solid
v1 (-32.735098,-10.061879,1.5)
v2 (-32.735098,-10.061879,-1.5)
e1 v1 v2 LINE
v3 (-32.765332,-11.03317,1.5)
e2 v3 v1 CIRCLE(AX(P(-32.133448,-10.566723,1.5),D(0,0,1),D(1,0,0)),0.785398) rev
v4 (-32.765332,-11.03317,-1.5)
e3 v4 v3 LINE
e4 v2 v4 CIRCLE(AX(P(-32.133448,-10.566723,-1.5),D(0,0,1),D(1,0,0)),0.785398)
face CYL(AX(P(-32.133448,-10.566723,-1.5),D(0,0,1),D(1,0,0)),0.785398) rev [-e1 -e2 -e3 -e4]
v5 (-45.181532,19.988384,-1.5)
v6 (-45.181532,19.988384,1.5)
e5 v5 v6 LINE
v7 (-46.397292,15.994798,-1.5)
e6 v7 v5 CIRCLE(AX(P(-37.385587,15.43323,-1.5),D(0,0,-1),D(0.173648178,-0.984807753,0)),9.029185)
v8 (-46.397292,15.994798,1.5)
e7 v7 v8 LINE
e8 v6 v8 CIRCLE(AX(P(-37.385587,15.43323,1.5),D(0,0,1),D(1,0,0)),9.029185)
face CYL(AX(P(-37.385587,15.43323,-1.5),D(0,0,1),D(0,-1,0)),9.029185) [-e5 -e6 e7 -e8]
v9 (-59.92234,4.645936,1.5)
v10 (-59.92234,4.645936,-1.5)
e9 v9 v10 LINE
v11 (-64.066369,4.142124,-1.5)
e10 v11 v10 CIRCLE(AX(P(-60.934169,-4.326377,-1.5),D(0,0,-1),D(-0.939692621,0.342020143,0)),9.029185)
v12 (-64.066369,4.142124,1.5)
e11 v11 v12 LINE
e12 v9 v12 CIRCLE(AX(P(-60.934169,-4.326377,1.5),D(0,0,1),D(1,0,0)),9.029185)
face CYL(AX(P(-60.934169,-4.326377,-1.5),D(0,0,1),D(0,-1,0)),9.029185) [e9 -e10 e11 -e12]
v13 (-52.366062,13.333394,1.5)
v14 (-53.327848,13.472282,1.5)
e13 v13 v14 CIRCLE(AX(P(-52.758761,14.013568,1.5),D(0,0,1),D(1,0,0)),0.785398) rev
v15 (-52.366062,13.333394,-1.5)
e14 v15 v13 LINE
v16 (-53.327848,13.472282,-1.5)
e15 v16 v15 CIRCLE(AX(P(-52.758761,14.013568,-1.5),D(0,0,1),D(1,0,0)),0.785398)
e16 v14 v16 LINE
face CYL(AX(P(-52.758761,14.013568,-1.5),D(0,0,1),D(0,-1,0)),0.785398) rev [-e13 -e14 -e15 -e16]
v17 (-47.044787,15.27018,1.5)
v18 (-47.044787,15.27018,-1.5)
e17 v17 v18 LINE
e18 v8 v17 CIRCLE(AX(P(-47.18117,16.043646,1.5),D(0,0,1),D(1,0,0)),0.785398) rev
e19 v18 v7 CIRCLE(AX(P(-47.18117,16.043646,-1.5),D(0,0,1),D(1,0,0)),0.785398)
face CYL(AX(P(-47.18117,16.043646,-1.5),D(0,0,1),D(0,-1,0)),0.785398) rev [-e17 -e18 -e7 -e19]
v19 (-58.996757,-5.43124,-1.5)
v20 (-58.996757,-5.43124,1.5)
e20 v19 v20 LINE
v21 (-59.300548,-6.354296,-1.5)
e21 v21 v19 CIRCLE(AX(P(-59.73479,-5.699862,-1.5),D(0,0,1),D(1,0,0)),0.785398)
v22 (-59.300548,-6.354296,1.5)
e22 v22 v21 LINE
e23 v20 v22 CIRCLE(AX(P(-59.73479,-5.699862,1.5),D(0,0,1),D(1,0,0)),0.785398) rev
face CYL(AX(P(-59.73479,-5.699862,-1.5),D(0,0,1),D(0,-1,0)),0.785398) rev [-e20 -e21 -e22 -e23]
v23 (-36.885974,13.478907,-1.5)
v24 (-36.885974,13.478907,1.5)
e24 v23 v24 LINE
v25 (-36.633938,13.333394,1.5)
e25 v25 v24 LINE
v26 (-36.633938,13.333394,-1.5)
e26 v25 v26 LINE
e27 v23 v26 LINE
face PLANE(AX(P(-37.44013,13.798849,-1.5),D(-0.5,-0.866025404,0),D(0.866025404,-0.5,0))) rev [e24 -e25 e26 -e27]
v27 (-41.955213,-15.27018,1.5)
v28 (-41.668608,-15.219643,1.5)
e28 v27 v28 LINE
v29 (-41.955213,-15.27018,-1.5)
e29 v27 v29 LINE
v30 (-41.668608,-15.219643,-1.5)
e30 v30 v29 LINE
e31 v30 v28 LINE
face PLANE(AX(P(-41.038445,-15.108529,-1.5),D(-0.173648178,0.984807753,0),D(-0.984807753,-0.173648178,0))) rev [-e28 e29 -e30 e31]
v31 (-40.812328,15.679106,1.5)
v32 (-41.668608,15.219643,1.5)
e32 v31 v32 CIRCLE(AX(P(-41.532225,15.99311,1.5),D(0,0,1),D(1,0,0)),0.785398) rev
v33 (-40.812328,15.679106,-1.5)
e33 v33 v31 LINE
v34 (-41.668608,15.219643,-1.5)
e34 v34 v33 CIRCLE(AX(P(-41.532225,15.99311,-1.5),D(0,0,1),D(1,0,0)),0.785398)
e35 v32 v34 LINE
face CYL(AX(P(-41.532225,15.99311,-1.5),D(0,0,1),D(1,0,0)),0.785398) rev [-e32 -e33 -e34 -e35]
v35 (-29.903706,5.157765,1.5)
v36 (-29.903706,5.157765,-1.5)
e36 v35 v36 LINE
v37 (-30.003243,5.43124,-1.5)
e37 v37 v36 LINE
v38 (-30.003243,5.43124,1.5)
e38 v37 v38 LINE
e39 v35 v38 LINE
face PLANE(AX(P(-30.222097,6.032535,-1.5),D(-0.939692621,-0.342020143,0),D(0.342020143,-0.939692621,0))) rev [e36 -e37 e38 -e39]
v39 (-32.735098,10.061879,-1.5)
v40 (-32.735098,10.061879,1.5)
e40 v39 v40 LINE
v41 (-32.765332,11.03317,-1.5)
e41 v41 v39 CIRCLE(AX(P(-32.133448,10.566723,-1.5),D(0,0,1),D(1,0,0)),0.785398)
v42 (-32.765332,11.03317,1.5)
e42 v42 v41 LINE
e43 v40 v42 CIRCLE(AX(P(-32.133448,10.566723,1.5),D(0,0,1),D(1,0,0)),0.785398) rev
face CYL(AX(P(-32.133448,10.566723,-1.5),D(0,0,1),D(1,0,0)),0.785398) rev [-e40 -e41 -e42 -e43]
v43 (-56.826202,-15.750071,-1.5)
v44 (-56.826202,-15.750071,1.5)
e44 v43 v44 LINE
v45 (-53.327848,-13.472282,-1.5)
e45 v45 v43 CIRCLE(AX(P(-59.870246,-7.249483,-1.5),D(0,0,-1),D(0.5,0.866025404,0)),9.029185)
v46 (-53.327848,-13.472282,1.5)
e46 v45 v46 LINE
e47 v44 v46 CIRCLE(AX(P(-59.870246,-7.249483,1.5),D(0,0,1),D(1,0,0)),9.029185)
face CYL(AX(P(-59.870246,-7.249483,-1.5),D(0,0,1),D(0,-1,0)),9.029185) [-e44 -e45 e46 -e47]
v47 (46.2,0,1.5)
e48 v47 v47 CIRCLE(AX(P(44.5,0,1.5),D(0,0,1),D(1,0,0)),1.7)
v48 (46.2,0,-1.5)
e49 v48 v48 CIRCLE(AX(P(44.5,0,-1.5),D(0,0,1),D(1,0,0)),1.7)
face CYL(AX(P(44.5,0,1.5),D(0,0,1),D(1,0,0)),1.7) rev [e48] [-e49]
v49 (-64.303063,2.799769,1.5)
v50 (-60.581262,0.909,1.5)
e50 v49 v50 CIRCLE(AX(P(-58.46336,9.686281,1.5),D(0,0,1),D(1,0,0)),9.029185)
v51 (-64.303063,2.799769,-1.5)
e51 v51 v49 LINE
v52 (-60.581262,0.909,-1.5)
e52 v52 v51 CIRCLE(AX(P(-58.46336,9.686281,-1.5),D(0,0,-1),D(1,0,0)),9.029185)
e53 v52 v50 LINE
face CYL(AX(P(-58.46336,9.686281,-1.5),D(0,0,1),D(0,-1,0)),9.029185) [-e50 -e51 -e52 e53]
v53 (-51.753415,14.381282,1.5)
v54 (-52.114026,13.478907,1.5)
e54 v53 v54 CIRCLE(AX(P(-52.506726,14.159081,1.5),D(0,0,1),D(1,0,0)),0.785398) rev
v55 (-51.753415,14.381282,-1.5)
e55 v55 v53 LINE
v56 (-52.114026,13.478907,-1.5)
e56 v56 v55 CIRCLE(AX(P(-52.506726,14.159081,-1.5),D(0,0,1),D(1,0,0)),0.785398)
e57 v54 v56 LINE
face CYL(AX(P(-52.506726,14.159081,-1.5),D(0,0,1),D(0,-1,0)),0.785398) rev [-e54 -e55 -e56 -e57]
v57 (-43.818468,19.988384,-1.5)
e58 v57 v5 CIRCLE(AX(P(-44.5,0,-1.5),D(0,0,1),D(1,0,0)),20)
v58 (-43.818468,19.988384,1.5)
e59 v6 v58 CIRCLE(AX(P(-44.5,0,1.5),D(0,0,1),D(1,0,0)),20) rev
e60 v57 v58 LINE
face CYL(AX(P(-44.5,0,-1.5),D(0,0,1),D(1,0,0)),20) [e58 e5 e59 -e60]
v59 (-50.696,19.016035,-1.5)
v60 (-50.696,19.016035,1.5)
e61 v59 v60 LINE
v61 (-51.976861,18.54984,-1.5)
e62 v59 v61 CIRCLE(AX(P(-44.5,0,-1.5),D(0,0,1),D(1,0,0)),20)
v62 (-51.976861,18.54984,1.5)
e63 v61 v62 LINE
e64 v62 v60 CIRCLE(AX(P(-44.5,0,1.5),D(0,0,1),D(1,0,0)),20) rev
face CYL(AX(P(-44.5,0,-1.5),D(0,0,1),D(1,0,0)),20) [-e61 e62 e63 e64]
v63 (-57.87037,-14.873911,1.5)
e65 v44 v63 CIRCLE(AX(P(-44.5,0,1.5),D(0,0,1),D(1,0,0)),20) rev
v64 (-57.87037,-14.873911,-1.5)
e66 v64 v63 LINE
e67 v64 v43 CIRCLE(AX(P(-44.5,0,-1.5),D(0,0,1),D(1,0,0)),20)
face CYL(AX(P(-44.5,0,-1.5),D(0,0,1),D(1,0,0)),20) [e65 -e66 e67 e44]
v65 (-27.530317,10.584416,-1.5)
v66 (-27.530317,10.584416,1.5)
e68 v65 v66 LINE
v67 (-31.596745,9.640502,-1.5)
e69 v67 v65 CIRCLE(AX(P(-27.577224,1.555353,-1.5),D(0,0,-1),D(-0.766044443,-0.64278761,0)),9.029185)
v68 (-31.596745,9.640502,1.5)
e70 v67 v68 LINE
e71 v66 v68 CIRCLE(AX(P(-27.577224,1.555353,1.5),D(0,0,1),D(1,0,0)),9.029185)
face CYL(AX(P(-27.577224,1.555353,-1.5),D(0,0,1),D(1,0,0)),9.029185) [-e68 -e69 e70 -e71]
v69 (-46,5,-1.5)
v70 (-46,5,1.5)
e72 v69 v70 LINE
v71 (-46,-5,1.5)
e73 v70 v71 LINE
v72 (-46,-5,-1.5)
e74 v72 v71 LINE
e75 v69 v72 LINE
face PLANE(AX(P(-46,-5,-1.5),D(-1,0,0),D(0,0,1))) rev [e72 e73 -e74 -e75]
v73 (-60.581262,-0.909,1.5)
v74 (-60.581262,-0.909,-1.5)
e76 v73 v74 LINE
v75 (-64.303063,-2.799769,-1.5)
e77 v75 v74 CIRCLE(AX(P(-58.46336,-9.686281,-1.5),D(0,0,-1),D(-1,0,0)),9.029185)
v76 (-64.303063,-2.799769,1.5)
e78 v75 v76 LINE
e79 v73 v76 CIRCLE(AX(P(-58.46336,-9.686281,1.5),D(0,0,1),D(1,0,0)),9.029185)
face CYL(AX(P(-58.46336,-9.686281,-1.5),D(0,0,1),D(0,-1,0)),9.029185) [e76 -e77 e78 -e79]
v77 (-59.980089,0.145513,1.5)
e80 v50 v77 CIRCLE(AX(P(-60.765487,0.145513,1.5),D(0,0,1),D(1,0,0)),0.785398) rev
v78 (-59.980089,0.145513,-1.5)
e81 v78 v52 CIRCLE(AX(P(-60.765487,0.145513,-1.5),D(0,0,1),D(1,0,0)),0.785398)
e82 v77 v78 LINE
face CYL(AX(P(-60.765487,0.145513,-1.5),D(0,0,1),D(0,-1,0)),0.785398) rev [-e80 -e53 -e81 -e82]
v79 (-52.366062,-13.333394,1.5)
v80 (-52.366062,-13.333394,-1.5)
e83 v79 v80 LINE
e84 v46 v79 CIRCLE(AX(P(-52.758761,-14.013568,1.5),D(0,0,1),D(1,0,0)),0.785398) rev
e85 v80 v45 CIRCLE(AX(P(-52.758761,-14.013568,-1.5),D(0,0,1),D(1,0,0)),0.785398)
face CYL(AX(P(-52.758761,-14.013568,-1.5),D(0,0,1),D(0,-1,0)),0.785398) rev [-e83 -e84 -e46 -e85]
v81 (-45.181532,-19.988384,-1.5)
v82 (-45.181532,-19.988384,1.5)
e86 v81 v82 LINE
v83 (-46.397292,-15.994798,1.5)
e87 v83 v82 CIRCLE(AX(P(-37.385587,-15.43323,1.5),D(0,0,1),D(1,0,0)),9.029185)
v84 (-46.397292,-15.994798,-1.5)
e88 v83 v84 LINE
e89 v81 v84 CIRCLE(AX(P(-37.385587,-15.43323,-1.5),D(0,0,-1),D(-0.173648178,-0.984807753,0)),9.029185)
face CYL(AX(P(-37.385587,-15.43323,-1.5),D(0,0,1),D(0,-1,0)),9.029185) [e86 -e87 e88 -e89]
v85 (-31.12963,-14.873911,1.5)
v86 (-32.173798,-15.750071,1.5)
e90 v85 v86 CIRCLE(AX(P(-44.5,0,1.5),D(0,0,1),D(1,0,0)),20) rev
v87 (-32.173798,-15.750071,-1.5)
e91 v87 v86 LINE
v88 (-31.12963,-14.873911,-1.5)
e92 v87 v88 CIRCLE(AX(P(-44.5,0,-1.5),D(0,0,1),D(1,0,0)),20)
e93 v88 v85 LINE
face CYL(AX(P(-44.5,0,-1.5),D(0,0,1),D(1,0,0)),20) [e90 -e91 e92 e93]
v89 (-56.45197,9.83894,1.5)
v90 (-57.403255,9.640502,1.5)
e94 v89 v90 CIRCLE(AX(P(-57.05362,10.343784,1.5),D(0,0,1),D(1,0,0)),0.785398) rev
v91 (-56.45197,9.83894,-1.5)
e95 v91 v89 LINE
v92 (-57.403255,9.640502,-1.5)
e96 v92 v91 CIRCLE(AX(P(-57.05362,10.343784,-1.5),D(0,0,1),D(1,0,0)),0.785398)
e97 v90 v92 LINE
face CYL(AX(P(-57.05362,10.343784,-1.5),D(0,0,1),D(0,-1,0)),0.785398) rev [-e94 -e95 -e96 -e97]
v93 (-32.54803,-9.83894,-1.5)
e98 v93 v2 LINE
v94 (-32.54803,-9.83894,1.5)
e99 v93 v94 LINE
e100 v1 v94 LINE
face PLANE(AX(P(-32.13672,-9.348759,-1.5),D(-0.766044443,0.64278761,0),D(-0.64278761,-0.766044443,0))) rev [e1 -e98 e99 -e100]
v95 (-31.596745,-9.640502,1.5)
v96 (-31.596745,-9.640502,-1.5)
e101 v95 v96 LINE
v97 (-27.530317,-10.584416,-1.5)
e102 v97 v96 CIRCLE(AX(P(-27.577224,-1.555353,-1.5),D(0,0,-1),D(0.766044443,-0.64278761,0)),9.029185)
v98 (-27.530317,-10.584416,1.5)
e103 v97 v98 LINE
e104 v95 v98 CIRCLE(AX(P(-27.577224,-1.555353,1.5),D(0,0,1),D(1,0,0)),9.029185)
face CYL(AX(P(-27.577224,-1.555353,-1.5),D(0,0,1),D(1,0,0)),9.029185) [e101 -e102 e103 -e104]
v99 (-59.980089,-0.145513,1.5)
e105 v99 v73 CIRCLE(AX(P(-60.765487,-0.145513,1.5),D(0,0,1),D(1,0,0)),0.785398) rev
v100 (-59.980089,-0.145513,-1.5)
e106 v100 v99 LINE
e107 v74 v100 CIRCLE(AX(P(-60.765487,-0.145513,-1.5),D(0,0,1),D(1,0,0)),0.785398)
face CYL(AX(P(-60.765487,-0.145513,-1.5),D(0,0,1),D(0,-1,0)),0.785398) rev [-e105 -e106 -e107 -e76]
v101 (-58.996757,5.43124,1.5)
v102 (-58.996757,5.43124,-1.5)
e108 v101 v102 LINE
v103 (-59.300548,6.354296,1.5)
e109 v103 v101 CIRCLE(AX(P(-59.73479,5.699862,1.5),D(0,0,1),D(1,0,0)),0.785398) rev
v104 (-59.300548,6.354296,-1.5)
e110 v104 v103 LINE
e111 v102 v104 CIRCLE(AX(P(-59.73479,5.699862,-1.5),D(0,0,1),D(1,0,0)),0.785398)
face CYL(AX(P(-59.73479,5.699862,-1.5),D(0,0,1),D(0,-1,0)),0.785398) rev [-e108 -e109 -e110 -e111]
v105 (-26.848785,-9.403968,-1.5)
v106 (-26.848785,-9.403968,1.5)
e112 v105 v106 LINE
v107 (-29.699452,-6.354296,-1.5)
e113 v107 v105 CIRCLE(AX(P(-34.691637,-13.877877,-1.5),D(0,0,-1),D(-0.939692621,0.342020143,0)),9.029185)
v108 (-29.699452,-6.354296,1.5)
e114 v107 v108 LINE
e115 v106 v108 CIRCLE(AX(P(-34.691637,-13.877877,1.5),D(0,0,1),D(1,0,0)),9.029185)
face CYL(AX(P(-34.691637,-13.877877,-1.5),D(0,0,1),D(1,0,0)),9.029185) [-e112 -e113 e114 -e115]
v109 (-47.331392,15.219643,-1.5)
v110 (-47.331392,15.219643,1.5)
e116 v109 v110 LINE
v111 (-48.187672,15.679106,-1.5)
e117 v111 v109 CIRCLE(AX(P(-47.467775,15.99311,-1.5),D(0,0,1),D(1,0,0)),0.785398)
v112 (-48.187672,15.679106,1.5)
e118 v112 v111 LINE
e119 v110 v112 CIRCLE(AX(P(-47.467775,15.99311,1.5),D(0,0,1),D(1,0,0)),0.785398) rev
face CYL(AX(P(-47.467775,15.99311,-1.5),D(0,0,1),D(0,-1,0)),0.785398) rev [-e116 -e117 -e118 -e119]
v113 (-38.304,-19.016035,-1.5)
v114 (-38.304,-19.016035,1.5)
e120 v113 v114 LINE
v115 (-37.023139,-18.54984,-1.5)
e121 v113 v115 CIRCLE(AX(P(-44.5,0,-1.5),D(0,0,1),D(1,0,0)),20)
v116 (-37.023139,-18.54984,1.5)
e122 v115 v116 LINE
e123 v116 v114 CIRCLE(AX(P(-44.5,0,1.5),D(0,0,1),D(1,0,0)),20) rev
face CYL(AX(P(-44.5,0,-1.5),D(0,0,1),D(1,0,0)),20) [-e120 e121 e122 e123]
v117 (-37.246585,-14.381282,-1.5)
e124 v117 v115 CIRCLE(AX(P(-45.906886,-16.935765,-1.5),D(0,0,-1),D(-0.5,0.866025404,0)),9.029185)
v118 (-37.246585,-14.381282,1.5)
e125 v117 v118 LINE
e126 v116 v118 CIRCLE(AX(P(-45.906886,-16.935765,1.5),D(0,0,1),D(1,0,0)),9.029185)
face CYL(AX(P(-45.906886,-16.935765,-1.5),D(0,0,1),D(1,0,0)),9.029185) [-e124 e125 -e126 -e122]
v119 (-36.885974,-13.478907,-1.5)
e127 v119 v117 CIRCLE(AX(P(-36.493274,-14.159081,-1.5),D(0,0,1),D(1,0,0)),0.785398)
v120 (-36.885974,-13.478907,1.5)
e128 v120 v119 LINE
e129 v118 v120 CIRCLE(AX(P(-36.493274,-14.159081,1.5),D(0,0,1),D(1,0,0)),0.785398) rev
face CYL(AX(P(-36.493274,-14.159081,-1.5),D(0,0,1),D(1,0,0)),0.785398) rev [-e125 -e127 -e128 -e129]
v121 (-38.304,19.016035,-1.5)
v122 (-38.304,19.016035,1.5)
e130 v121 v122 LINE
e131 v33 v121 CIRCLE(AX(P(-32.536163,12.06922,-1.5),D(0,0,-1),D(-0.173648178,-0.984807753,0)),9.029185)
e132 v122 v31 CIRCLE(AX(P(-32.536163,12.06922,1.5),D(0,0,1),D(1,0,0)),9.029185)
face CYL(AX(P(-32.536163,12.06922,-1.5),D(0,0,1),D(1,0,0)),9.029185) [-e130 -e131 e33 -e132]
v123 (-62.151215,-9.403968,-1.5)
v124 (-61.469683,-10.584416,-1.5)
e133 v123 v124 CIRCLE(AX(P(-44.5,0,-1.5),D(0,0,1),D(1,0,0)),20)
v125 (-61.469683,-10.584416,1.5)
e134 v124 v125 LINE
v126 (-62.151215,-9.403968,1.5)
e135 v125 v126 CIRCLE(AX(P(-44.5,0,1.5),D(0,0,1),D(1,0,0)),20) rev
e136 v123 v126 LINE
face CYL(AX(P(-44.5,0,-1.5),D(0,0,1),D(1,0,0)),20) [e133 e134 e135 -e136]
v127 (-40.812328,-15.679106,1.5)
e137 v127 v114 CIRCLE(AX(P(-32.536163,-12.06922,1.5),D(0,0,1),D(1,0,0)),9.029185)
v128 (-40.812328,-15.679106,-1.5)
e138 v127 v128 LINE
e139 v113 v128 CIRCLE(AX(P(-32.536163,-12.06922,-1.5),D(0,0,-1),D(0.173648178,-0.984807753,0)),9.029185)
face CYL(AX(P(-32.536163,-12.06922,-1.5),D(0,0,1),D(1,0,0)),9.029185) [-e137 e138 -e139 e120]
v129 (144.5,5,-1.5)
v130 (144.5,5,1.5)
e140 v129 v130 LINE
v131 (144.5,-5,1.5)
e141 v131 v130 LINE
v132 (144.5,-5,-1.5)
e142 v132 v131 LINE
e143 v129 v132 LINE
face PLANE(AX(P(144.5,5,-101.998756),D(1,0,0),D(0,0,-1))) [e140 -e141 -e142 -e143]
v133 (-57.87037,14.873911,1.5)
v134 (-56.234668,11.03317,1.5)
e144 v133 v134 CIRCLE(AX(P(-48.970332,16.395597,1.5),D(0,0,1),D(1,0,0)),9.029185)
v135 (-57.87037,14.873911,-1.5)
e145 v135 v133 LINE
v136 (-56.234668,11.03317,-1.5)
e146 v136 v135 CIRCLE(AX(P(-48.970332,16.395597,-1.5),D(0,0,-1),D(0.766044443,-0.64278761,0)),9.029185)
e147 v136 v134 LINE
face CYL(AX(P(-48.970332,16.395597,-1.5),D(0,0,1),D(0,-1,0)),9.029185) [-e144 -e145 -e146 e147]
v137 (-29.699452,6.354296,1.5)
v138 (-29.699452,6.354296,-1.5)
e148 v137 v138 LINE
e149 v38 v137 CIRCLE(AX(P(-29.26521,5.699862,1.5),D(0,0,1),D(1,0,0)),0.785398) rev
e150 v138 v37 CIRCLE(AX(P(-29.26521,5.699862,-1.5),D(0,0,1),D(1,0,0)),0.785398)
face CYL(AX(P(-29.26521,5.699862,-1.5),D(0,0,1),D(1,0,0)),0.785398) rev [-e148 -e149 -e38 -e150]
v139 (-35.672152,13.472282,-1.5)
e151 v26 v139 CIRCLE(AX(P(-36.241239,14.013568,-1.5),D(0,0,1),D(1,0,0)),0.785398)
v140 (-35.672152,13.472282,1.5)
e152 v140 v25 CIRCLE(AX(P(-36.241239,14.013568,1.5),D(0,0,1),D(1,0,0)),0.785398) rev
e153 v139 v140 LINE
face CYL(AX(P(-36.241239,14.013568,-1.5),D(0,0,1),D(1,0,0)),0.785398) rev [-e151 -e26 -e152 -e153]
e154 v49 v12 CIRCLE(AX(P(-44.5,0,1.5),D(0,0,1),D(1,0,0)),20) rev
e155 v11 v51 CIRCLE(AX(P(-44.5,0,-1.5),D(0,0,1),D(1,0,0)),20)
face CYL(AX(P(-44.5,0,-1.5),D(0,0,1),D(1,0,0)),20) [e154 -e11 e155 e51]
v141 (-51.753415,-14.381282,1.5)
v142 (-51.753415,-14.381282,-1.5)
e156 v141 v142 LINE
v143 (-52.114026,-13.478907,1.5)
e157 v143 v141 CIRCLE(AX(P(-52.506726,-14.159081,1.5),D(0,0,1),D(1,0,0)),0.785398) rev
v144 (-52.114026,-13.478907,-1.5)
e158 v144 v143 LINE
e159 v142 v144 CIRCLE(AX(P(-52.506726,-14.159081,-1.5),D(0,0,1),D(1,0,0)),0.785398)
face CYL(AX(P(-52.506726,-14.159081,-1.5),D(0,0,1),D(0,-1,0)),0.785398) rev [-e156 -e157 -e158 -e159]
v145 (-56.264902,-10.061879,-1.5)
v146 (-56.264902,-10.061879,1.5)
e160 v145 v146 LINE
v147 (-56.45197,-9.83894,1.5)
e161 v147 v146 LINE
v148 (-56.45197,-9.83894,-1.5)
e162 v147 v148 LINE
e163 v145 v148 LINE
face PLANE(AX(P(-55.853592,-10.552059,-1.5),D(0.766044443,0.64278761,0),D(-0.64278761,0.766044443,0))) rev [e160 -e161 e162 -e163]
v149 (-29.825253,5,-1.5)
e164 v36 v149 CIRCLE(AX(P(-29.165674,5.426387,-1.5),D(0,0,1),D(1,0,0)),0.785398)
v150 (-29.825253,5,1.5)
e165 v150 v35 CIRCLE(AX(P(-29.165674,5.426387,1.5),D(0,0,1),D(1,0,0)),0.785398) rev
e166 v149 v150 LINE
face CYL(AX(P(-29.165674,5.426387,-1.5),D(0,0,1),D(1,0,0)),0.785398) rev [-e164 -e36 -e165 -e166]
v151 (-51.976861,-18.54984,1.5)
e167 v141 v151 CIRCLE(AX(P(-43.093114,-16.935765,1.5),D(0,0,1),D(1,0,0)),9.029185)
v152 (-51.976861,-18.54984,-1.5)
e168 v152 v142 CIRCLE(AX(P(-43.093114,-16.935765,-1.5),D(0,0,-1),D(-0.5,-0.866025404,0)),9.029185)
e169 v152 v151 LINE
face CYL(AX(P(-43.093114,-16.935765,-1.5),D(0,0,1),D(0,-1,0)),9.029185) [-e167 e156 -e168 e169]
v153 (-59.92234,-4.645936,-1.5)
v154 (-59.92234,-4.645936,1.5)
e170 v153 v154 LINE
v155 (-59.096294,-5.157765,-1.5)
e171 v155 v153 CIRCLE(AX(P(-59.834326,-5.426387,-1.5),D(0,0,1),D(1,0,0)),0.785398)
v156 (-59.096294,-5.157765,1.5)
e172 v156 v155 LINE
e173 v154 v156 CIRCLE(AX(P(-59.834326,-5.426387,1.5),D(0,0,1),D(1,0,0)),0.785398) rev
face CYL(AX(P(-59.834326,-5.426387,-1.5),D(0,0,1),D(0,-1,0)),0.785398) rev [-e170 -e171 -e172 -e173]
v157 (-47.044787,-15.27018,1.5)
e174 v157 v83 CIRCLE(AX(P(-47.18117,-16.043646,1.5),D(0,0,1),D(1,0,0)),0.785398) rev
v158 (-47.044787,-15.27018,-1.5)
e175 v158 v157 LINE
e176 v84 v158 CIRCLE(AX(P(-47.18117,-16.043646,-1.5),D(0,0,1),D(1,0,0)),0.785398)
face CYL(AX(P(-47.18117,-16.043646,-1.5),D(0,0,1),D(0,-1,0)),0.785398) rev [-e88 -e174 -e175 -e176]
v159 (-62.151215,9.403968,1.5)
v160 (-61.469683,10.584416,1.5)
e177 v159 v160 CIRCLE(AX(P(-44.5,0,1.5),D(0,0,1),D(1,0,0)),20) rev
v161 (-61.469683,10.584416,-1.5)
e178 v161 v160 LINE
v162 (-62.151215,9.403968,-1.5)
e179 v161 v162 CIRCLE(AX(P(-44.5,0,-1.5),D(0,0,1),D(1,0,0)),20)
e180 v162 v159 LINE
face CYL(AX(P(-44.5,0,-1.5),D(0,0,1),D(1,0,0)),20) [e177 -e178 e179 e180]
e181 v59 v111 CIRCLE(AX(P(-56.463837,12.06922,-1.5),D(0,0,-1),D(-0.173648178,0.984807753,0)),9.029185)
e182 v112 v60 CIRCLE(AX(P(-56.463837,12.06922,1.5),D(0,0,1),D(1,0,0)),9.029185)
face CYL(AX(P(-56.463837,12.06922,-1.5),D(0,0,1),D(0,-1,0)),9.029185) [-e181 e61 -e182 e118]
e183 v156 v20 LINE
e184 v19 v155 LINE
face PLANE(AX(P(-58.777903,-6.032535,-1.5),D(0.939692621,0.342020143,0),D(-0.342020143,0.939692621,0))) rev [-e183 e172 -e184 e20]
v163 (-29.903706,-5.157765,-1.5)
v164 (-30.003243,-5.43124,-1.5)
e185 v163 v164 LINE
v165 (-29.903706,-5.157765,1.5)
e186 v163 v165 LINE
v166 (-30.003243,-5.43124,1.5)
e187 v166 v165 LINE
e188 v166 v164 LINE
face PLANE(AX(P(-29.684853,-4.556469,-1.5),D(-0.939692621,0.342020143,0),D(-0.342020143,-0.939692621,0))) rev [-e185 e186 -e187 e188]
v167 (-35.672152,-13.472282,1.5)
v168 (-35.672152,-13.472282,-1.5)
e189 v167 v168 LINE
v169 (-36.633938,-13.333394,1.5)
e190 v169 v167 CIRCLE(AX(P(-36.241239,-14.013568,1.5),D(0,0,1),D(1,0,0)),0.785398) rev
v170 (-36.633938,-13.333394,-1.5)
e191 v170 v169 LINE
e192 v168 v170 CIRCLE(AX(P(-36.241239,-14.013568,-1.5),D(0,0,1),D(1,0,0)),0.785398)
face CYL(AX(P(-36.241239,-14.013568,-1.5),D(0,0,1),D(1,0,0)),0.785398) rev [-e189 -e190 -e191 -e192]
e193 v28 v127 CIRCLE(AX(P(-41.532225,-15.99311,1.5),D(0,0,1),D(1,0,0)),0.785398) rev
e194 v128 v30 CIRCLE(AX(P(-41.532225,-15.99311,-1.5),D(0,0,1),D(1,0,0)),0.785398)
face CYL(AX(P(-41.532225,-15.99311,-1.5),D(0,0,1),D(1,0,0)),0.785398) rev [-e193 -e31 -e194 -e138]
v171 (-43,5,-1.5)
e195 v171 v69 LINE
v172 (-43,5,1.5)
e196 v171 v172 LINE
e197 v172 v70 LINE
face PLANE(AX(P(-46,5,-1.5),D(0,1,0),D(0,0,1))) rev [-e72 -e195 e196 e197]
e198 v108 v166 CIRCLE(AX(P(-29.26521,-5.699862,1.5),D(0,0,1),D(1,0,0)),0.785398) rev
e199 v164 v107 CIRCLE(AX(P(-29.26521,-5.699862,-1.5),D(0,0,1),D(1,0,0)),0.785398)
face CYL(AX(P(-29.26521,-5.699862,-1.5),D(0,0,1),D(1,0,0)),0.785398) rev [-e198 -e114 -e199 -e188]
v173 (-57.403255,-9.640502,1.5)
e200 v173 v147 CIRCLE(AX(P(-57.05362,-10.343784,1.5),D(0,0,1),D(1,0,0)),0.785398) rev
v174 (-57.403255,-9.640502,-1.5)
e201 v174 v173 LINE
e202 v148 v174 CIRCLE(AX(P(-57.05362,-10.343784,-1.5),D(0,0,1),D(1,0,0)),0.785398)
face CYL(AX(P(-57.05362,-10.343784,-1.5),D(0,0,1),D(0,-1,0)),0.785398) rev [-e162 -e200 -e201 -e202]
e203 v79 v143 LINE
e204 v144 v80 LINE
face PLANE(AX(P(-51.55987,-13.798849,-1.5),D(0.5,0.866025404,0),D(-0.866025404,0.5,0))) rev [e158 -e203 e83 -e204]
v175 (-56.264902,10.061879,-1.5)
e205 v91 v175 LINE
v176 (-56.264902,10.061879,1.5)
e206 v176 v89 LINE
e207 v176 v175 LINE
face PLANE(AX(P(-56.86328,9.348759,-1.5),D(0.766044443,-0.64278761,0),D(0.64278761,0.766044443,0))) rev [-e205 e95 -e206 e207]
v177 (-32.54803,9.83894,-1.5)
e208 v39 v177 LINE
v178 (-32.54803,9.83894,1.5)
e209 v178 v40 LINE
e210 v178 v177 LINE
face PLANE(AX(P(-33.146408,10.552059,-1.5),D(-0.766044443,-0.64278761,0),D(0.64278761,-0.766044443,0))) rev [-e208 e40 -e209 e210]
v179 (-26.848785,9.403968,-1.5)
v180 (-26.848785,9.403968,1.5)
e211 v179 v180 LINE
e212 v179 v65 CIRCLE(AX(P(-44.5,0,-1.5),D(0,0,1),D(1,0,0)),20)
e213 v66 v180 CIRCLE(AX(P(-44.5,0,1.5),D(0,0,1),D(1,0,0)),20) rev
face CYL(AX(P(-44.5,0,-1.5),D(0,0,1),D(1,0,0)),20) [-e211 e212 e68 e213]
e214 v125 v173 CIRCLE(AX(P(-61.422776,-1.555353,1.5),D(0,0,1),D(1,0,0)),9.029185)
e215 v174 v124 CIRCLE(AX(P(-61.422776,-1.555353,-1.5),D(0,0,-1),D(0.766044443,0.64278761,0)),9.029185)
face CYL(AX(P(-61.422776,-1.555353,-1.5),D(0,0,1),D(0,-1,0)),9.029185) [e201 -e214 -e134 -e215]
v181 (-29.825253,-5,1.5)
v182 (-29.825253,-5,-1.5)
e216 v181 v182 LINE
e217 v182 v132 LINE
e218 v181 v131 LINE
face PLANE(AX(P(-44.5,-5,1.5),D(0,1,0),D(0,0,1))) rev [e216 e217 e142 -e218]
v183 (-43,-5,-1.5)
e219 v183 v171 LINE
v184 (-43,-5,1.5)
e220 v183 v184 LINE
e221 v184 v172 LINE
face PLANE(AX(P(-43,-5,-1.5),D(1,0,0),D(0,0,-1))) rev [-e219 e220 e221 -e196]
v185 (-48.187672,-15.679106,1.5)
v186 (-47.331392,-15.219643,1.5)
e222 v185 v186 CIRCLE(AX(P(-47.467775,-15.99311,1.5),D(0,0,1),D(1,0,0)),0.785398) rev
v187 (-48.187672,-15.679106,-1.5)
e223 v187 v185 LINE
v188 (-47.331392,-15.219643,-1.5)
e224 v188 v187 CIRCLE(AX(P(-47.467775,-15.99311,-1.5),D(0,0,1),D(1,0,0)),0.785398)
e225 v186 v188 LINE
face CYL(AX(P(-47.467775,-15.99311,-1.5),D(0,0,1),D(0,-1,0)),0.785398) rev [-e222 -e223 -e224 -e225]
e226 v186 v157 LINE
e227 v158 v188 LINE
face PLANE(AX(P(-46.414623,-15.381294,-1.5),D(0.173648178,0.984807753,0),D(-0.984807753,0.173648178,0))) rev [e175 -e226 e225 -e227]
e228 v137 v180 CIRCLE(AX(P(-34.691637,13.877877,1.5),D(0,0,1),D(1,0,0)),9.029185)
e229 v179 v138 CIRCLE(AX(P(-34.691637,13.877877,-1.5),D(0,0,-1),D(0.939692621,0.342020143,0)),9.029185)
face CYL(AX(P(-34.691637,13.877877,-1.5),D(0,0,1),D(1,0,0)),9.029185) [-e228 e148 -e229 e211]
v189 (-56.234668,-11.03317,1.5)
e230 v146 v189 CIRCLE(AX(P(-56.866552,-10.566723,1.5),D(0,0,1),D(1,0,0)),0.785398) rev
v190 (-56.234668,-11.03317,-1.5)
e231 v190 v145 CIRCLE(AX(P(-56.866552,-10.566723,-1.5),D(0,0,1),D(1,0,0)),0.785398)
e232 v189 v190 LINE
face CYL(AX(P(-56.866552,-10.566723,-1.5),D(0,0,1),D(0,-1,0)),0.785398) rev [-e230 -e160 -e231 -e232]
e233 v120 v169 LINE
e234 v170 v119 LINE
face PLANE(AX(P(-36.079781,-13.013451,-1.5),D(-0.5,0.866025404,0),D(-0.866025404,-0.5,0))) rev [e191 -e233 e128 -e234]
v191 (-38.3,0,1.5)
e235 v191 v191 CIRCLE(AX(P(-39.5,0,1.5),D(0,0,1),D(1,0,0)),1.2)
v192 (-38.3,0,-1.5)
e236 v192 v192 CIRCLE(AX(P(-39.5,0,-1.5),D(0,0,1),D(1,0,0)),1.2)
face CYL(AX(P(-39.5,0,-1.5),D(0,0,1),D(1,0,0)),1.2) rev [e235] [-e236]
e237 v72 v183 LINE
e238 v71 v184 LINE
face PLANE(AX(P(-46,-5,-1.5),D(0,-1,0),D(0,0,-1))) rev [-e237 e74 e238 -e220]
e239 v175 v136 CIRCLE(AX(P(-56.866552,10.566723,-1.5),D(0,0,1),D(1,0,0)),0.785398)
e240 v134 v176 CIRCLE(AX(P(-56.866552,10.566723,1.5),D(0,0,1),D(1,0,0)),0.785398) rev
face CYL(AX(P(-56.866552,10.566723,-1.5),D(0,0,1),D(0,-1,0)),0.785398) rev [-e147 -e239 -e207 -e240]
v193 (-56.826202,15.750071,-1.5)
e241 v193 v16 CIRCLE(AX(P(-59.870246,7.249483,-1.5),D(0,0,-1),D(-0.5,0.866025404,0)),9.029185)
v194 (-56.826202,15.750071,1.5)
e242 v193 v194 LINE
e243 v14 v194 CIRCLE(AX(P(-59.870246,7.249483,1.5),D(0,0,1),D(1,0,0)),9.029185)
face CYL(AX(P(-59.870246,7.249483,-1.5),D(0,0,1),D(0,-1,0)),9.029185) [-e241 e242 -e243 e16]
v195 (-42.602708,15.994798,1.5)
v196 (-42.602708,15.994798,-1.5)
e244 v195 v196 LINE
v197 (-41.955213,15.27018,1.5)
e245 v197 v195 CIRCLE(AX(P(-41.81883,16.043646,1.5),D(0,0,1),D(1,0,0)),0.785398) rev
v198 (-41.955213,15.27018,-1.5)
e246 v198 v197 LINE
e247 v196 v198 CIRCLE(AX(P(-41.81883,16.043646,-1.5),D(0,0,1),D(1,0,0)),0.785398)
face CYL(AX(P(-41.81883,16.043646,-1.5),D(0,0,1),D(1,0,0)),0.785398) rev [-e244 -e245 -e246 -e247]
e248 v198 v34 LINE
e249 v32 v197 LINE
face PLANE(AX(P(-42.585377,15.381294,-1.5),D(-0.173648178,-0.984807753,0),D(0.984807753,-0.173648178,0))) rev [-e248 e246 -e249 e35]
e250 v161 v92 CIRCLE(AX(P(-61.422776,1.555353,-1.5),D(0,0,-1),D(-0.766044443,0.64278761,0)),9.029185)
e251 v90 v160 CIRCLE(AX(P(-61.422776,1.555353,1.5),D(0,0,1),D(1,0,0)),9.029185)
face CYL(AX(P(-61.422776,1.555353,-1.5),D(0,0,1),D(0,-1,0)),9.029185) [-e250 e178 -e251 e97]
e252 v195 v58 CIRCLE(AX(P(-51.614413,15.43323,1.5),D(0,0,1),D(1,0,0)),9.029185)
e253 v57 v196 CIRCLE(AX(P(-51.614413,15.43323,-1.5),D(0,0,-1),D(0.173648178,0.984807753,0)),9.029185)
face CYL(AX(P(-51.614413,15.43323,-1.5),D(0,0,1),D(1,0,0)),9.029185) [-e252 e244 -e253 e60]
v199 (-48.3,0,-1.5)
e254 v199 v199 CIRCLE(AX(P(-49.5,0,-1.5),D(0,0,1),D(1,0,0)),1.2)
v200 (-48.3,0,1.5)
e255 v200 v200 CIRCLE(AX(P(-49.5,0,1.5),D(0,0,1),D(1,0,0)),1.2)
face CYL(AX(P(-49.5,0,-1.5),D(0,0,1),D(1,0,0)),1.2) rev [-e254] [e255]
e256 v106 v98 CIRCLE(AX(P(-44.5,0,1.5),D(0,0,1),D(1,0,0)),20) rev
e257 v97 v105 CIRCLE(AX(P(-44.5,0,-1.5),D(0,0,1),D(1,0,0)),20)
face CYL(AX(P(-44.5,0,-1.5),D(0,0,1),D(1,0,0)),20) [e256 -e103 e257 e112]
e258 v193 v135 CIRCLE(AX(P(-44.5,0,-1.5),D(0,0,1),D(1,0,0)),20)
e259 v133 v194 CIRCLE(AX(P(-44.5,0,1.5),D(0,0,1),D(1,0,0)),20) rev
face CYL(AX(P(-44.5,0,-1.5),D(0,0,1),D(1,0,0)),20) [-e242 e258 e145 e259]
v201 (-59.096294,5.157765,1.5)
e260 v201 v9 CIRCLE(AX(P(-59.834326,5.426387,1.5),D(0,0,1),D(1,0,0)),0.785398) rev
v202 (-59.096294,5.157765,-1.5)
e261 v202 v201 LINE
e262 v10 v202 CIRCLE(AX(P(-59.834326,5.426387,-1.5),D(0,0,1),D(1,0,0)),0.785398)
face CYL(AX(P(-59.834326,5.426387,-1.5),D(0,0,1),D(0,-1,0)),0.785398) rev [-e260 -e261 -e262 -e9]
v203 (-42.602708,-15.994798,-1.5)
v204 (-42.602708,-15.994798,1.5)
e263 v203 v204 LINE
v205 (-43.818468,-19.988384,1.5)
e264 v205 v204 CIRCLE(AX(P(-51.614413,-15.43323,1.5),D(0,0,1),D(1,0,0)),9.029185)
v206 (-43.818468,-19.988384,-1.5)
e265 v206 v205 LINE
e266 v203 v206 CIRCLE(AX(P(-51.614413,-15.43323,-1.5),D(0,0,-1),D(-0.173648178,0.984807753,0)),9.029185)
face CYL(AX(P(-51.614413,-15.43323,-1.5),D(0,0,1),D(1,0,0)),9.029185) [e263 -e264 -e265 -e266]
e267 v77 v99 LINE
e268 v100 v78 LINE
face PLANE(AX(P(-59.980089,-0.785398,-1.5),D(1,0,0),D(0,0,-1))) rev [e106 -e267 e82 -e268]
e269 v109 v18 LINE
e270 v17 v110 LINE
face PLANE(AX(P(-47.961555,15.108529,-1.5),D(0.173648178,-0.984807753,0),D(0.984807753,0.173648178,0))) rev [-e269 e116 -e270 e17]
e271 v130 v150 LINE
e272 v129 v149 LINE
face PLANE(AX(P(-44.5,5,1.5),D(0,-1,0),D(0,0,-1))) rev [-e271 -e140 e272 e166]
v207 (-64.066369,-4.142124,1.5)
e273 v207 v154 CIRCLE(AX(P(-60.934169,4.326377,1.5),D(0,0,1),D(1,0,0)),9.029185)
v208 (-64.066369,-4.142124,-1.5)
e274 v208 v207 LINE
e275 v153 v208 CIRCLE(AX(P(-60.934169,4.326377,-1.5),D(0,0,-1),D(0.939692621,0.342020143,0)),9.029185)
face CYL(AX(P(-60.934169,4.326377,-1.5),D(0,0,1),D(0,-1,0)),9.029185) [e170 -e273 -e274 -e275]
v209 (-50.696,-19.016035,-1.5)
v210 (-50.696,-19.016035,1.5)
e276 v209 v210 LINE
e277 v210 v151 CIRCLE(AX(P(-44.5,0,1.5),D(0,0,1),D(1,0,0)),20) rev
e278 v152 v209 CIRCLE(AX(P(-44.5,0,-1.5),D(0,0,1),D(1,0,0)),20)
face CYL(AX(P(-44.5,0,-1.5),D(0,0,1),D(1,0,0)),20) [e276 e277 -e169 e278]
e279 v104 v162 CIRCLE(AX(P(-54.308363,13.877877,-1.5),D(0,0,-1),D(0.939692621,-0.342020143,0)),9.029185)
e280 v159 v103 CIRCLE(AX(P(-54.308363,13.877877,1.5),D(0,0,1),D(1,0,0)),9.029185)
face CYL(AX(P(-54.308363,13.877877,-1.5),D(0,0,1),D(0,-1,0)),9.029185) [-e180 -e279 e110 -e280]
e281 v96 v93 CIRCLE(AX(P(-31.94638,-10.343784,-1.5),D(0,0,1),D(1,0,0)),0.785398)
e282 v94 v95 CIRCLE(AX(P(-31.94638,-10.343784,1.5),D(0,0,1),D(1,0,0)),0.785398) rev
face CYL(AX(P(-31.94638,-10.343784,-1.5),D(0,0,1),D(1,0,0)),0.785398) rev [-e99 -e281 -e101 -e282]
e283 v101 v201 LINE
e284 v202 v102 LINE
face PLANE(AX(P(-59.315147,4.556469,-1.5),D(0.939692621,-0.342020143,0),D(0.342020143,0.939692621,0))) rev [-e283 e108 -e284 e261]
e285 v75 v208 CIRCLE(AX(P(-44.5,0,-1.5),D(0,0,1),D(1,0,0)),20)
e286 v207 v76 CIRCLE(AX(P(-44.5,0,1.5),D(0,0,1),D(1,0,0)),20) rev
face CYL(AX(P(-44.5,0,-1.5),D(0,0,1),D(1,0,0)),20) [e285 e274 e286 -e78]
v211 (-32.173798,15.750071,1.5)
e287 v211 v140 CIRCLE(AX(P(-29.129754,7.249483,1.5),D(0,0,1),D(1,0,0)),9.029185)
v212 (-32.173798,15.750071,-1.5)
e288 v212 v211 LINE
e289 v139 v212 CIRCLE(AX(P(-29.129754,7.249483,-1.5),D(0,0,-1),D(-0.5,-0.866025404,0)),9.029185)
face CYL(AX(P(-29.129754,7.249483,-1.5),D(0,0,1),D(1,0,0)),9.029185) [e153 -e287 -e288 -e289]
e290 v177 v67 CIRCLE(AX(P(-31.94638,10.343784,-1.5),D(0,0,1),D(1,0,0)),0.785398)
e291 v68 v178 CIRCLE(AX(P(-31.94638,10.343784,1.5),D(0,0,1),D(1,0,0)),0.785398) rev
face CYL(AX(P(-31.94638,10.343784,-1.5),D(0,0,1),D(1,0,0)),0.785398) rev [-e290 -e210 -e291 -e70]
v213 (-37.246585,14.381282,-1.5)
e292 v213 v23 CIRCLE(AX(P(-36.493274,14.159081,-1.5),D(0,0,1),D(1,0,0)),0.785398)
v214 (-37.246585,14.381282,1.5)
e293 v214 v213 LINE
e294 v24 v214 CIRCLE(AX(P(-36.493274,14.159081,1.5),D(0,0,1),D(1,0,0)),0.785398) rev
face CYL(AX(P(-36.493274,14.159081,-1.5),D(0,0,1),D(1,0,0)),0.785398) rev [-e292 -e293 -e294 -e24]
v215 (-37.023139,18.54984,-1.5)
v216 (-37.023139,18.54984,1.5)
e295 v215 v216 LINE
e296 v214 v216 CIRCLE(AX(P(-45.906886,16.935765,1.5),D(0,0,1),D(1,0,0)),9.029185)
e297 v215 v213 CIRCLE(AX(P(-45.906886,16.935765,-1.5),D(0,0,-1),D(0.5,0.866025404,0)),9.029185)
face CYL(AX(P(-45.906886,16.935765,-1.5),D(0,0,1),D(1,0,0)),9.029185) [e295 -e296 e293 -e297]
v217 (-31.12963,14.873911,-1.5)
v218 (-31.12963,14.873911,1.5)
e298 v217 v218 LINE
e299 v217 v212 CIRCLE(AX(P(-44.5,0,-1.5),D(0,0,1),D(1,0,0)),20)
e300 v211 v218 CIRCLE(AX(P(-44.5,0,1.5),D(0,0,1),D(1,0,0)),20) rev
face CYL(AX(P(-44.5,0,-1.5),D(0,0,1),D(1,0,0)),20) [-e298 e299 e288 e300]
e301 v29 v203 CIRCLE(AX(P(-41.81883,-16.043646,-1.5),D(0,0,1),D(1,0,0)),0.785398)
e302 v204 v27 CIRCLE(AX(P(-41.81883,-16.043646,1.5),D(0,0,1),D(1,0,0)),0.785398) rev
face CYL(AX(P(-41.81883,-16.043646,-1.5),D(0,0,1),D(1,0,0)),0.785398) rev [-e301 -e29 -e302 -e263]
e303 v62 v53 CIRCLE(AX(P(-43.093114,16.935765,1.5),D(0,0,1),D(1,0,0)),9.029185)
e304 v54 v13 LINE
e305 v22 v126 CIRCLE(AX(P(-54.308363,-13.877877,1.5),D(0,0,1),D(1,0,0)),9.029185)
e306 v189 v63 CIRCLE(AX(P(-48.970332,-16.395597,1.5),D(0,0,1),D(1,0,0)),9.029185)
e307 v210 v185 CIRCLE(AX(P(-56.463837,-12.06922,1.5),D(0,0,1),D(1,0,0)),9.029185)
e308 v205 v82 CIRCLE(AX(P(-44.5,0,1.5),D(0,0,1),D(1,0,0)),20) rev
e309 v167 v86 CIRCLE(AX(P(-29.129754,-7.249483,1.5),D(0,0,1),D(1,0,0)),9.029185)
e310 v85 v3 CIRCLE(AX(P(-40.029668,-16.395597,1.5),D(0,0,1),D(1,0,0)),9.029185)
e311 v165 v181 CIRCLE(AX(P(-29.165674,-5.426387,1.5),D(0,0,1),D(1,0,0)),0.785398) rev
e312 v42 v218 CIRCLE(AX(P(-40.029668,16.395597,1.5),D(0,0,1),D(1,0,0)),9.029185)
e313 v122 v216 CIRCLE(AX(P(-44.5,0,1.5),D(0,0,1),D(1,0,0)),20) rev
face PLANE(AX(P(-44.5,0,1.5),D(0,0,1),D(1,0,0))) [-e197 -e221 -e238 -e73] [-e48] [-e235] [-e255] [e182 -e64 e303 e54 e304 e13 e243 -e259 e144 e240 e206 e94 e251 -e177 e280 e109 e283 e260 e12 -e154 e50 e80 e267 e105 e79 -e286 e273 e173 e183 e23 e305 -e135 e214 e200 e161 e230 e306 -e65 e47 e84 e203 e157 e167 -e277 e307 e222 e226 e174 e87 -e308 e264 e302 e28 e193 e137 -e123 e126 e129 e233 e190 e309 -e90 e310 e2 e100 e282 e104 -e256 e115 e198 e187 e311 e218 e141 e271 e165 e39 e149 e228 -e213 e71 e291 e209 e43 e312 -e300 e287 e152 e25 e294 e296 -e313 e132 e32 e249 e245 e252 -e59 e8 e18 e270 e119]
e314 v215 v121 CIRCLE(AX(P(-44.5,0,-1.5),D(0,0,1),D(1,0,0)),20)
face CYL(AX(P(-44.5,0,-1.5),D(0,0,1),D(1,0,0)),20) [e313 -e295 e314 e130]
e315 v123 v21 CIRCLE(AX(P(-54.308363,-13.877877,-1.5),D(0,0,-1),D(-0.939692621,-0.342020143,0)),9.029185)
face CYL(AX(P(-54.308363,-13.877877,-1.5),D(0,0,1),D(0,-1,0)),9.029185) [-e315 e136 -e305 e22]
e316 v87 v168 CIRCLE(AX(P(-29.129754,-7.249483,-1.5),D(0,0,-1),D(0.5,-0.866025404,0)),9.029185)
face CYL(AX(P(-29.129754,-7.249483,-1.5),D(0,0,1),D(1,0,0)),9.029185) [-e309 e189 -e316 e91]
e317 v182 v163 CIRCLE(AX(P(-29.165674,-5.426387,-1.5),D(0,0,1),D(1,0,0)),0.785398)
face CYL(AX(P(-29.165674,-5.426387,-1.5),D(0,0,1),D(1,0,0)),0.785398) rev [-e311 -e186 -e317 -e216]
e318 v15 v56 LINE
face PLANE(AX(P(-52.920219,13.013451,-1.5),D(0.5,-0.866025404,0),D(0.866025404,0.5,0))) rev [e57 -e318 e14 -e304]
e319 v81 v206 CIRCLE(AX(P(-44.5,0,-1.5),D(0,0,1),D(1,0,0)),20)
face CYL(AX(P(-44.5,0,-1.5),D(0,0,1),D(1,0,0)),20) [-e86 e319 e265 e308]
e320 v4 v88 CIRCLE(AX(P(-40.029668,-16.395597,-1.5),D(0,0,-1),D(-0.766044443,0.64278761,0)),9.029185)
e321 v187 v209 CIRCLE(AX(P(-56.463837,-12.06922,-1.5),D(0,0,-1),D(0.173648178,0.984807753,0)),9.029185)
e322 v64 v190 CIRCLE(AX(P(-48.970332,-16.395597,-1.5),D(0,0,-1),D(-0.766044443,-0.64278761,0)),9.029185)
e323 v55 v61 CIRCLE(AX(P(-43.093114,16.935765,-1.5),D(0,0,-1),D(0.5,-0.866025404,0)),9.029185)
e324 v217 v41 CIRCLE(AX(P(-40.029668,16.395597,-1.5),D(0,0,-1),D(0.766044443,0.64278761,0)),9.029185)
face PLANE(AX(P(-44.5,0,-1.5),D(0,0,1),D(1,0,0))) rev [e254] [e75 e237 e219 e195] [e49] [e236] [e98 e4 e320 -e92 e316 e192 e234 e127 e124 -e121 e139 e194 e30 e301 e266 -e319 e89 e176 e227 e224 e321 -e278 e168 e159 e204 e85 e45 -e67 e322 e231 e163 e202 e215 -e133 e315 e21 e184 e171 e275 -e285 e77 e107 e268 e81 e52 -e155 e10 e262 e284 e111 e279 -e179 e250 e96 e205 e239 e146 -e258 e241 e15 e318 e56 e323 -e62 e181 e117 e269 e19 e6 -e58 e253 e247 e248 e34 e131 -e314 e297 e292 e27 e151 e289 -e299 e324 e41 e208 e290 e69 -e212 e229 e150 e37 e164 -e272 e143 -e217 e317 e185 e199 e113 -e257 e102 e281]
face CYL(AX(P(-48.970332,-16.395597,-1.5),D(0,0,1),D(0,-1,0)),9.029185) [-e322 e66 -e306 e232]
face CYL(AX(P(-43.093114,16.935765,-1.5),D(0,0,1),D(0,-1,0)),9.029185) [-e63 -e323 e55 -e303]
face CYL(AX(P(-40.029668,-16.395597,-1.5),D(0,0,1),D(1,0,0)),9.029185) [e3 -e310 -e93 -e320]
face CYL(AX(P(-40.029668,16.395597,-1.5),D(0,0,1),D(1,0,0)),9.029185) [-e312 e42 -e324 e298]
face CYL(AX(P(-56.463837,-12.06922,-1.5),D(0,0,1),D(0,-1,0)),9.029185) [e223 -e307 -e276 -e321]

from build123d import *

# Parameters (mm, degrees)
AUFSATZ_LINEAR_AUSTRAGEN1_DEPTH = 1.5
DURCHGANGSLOCH_F_R_M31_D        = 3.4
AUFSATZ_LINEAR_AUSTRAGEN2_DEPTH = 3
SKIZZE5_W                       = 4
SKIZZE5_H                       = 4
SCHNITT_LINEAR_AUSTRAGEN1_DEPTH = 145.617599206
F_36MM_SPUR_GEAR1_START         = -20
F_36MM_SPUR_GEAR1_DEPTH         = 3
SKIZZE7_W                       = 3
SKIZZE7_H                       = 10
SCHNITT_LINEAR_AUSTRAGEN3_DEPTH = 146.908361659
SKIZZE8_R                       = 1.2
SCHNITT_LINEAR_AUSTRAGEN4_DEPTH = 146.908361659


with BuildPart() as part:
    # Skizze1 → Aufsatz-Linear austragen1 (new, symmetric)
    with BuildSketch(Plane.XY):
        with BuildLine():
            Line((-44.5, 5), (44.5, 5))
            ThreePointArc((44.5, 5), (49.5, 0), (44.5, -5))
            Line((44.5, -5), (-44.5, -5))
            ThreePointArc((-44.5, -5), (-49.5, 0), (-44.5, 5))
        make_face()
    extrude(amount=AUFSATZ_LINEAR_AUSTRAGEN1_DEPTH, both=True)

    # Durchgangsloch für M31 (through all)
    with Locations(Plane.XY.offset(1.5)):
        with Locations((-44.5, 0), (44.5, 0)):
            Hole(DURCHGANGSLOCH_F_R_M31_D / 2)

    # Skizze4 → Aufsatz-Linear austragen2 (add)
    with BuildSketch(Plane.XY.offset(1.5)):
        with BuildLine():
            Line((44.5, 5), (144.5, 5))
            Line((144.5, 5), (144.5, -5))
            Line((144.5, -5), (44.5, -5))
            ThreePointArc((44.5, -5), (49.5, 0), (44.5, 5))
        make_face()
    extrude(amount=-AUFSATZ_LINEAR_AUSTRAGEN2_DEPTH)

    # Skizze5 → Schnitt-Linear austragen1 (cut, through all)
    with BuildSketch(Plane.XY.offset(1.5)):
        with Locations((-44.5, 0)):
            Rectangle(SKIZZE5_W, SKIZZE5_H)
    extrude(amount=-SCHNITT_LINEAR_AUSTRAGEN1_DEPTH, mode=Mode.SUBTRACT)


with BuildPart() as body_2:
    # 36mm_spur_gear1: read off the stored shape, not the designer's step
    # 36mm_spur_gear1 outline → 36mm_spur_gear1 (new body)
    with BuildSketch(Plane.XY.offset(F_36MM_SPUR_GEAR1_START)):
        with BuildLine():
            ThreePointArc((-68.651249783, 18.637616045), (-69.025162545, 20.70563552), (-69.867010124, 22.631202439))
            ThreePointArc((-69.867010124, 22.631202439), (-70.548541939, 22.642817953), (-71.230073753, 22.631202439))
            ThreePointArc((-71.230073753, 22.631202439), (-72.071921332, 20.70563552), (-72.445834093, 18.637616045))
            ThreePointArc((-72.445834093, 18.637616045), (-72.644060056, 18.163145097), (-73.09332879, 17.912997508))
            Line((-73.09332879, 17.912997508), (-73.379933512, 17.862461362))
            ThreePointArc((-73.379933512, 17.862461362), (-73.887663541, 17.94386425), (-74.236213637, 18.321923825))
            ThreePointArc((-74.236213637, 18.321923825), (-75.294881017, 20.13734077), (-76.744541648, 21.658852965))
            ThreePointArc((-76.744541648, 21.658852965), (-77.388944805, 21.436670368), (-78.025402482, 21.192657747))
            ThreePointArc((-78.025402482, 21.192657747), (-78.157897766, 19.095287893), (-77.801956511, 17.024099556))
            ThreePointArc((-77.801956511, 17.024099556), (-77.825949365, 16.510445436), (-78.162568364, 16.121724635))
            Line((-78.162568364, 16.121724635), (-78.414604327, 15.976211604))
            ThreePointArc((-78.414604327, 15.976211604), (-78.919555916, 15.879051399), (-79.376389859, 16.115100039))
            ThreePointArc((-79.376389859, 16.115100039), (-80.992120948, 17.458948377), (-82.874744165, 18.392889021))
            ThreePointArc((-82.874744165, 18.392889021), (-83.404294132, 17.963706815), (-83.918911483, 17.51672861))
            ThreePointArc((-83.918911483, 17.51672861), (-83.326073586, 15.500529579), (-82.283210083, 13.675988261))
            ThreePointArc((-82.283210083, 13.675988261), (-82.130075935, 13.185105236), (-82.313443981, 12.704696689))
            Line((-82.313443981, 12.704696689), (-82.500511927, 12.481757791))
            ThreePointArc((-82.500511927, 12.481757791), (-82.941780462, 12.217753449), (-83.451797337, 12.283320203))
            ThreePointArc((-83.451797337, 12.283320203), (-85.429711119, 12.993511991), (-87.518224777, 13.227234061))
            ThreePointArc((-87.518224777, 13.227234061), (-87.869050014, 12.642817953), (-88.199756591, 12.046786331))
            ThreePointArc((-88.199756591, 12.046786331), (-86.953090513, 10.354941482), (-85.349089492, 8.997113794))
            ThreePointArc((-85.349089492, 8.997113794), (-85.037298579, 8.588209601), (-85.045298779, 8.074057669))
            Line((-85.045298779, 8.074057669), (-85.144835555, 7.800582626))
            ThreePointArc((-85.144835555, 7.800582626), (-85.469197538, 7.401576967), (-85.970881782, 7.288753517))
            ThreePointArc((-85.970881782, 7.288753517), (-88.072412665, 7.279629144), (-90.114911193, 6.784942308))
            ThreePointArc((-90.114911193, 6.784942308), (-90.244696998, 6.115781506), (-90.351604708, 5.442586678))
            ThreePointArc((-90.351604708, 5.442586678), (-88.601476776, 4.279157469), (-86.629804432, 3.55181747))
            ThreePointArc((-86.629804432, 3.55181747), (-86.196963342, 3.274211989), (-86.028630753, 2.788330984))
            Line((-86.028630753, 2.788330984), (-86.028630753, 2.497304922))
            ThreePointArc((-86.028630753, 2.497304922), (-86.196963342, 2.011423916), (-86.629804432, 1.733818435))
            ThreePointArc((-86.629804432, 1.733818435), (-88.601476776, 1.006478436), (-90.351604708, -0.156950773))
            ThreePointArc((-90.351604708, -0.156950773), (-90.244696998, -0.830145601), (-90.114911193, -1.499306403))
            ThreePointArc((-90.114911193, -1.499306403), (-88.072412665, -1.993993239), (-85.970881782, -2.003117612))
            ThreePointArc((-85.970881782, -2.003117612), (-85.469197538, -2.115941062), (-85.144835555, -2.514946721))
            Line((-85.144835555, -2.514946721), (-85.045298779, -2.788421764))
            ThreePointArc((-85.045298779, -2.788421764), (-85.037298579, -3.302573696), (-85.349089492, -3.711477889))
            ThreePointArc((-85.349089492, -3.711477889), (-86.953090513, -5.069305577), (-88.199756591, -6.761150426))
            ThreePointArc((-88.199756591, -6.761150426), (-87.869050014, -7.357182048), (-87.518224777, -7.941598156))
            ThreePointArc((-87.518224777, -7.941598156), (-85.429711119, -7.707876086), (-83.451797337, -6.997684298))
            ThreePointArc((-83.451797337, -6.997684298), (-82.941780462, -6.932117544), (-82.500511927, -7.196121886))
            Line((-82.500511927, -7.196121886), (-82.313443981, -7.419060783))
            ThreePointArc((-82.313443981, -7.419060783), (-82.130075935, -7.89946933), (-82.283210083, -8.390352356))
            ThreePointArc((-82.283210083, -8.390352356), (-83.326073586, -10.214893673), (-83.918911483, -12.231092704))
            ThreePointArc((-83.918911483, -12.231092704), (-83.404294132, -12.67807091), (-82.874744165, -13.107253116))
            ThreePointArc((-82.874744165, -13.107253116), (-80.992120948, -12.173312471), (-79.376389859, -10.829464134))
            ThreePointArc((-79.376389859, -10.829464134), (-78.919555916, -10.593415494), (-78.414604327, -10.690575699))
            Line((-78.414604327, -10.690575699), (-78.162568364, -10.83608873))
            ThreePointArc((-78.162568364, -10.83608873), (-77.825949365, -11.224809531), (-77.801956511, -11.738463651))
            ThreePointArc((-77.801956511, -11.738463651), (-78.157897766, -13.809651988), (-78.025402482, -15.907021842))
            ThreePointArc((-78.025402482, -15.907021842), (-77.388944805, -16.151034463), (-76.744541648, -16.37321706))
            ThreePointArc((-76.744541648, -16.37321706), (-75.294881017, -14.851704865), (-74.236213637, -13.03628792))
            ThreePointArc((-74.236213637, -13.03628792), (-73.887663541, -12.658228345), (-73.379933512, -12.576825457))
            Line((-73.379933512, -12.576825457), (-73.09332879, -12.627361603))
            ThreePointArc((-73.09332879, -12.627361603), (-72.644060056, -12.877509192), (-72.445834093, -13.35198014))
            ThreePointArc((-72.445834093, -13.35198014), (-72.071921332, -15.419999615), (-71.230073753, -17.345566534))
            ThreePointArc((-71.230073753, -17.345566534), (-70.548541939, -17.357182047), (-69.867010124, -17.345566534))
            ThreePointArc((-69.867010124, -17.345566534), (-69.025162545, -15.419999615), (-68.651249783, -13.35198014))
            ThreePointArc((-68.651249783, -13.35198014), (-68.453023821, -12.877509192), (-68.003755086, -12.627361603))
            Line((-68.003755086, -12.627361603), (-67.717150364, -12.576825457))
            ThreePointArc((-67.717150364, -12.576825457), (-67.209420336, -12.658228345), (-66.86087024, -13.03628792))
            ThreePointArc((-66.86087024, -13.03628792), (-65.802202859, -14.851704865), (-64.352542228, -16.37321706))
            ThreePointArc((-64.352542228, -16.37321706), (-63.708139072, -16.151034463), (-63.071681394, -15.907021842))
            ThreePointArc((-63.071681394, -15.907021842), (-62.93918611, -13.809651988), (-63.295127365, -11.738463651))
            ThreePointArc((-63.295127365, -11.738463651), (-63.271134512, -11.224809531), (-62.934515512, -10.83608873))
            Line((-62.934515512, -10.83608873), (-62.682479549, -10.690575699))
            ThreePointArc((-62.682479549, -10.690575699), (-62.17752796, -10.593415494), (-61.720694017, -10.829464134))
            ThreePointArc((-61.720694017, -10.829464134), (-60.104962929, -12.173312471), (-58.222339712, -13.107253116))
            ThreePointArc((-58.222339712, -13.107253116), (-57.692789744, -12.67807091), (-57.178172393, -12.231092704))
            ThreePointArc((-57.178172393, -12.231092704), (-57.77101029, -10.214893673), (-58.813873793, -8.390352356))
            ThreePointArc((-58.813873793, -8.390352356), (-58.967007942, -7.89946933), (-58.783639896, -7.419060783))
            Line((-58.783639896, -7.419060783), (-58.596571949, -7.196121886))
            ThreePointArc((-58.596571949, -7.196121886), (-58.155303414, -6.932117544), (-57.645286539, -6.997684298))
            ThreePointArc((-57.645286539, -6.997684298), (-55.667372757, -7.707876086), (-53.578859099, -7.941598156))
            ThreePointArc((-53.578859099, -7.941598156), (-53.228033862, -7.357182048), (-52.897327285, -6.761150426))
            ThreePointArc((-52.897327285, -6.761150426), (-54.143993364, -5.069305577), (-55.747994385, -3.711477889))
            ThreePointArc((-55.747994385, -3.711477889), (-56.059785297, -3.302573696), (-56.051785097, -2.788421764))
            Line((-56.051785097, -2.788421764), (-55.952248322, -2.514946721))
            ThreePointArc((-55.952248322, -2.514946721), (-55.627886339, -2.115941062), (-55.126202094, -2.003117612))
            ThreePointArc((-55.126202094, -2.003117612), (-53.024671211, -1.993993239), (-50.982172683, -1.499306403))
            ThreePointArc((-50.982172683, -1.499306403), (-50.852386878, -0.830145601), (-50.745479168, -0.156950773))
            ThreePointArc((-50.745479168, -0.156950773), (-52.4956071, 1.006478436), (-54.467279444, 1.733818435))
            ThreePointArc((-54.467279444, 1.733818435), (-54.900120534, 2.011423916), (-55.068453123, 2.497304922))
            Line((-55.068453123, 2.497304922), (-55.068453123, 2.788330984))
            ThreePointArc((-55.068453123, 2.788330984), (-54.900120534, 3.274211989), (-54.467279444, 3.55181747))
            ThreePointArc((-54.467279444, 3.55181747), (-52.4956071, 4.279157469), (-50.745479168, 5.442586678))
            ThreePointArc((-50.745479168, 5.442586678), (-50.852386878, 6.115781506), (-50.982172683, 6.784942308))
            ThreePointArc((-50.982172683, 6.784942308), (-53.024671211, 7.279629144), (-55.126202094, 7.288753517))
            ThreePointArc((-55.126202094, 7.288753517), (-55.627886339, 7.401576967), (-55.952248322, 7.800582626))
            Line((-55.952248322, 7.800582626), (-56.051785097, 8.074057669))
            ThreePointArc((-56.051785097, 8.074057669), (-56.059785297, 8.588209601), (-55.747994385, 8.997113794))
            ThreePointArc((-55.747994385, 8.997113794), (-54.143993364, 10.354941482), (-52.897327285, 12.046786331))
            ThreePointArc((-52.897327285, 12.046786331), (-53.228033862, 12.642817953), (-53.578859099, 13.227234061))
            ThreePointArc((-53.578859099, 13.227234061), (-55.667372757, 12.993511991), (-57.645286539, 12.283320203))
            ThreePointArc((-57.645286539, 12.283320203), (-58.155303414, 12.217753449), (-58.596571949, 12.481757791))
            Line((-58.596571949, 12.481757791), (-58.783639896, 12.704696689))
            ThreePointArc((-58.783639896, 12.704696689), (-58.967007942, 13.185105236), (-58.813873793, 13.675988261))
            ThreePointArc((-58.813873793, 13.675988261), (-57.77101029, 15.500529579), (-57.178172393, 17.51672861))
            ThreePointArc((-57.178172393, 17.51672861), (-57.692789744, 17.963706815), (-58.222339712, 18.392889021))
            ThreePointArc((-58.222339712, 18.392889021), (-60.104962929, 17.458948377), (-61.720694017, 16.115100039))
            ThreePointArc((-61.720694017, 16.115100039), (-62.17752796, 15.879051399), (-62.682479549, 15.976211604))
            Line((-62.682479549, 15.976211604), (-62.934515512, 16.121724635))
            ThreePointArc((-62.934515512, 16.121724635), (-63.271134512, 16.510445436), (-63.295127365, 17.024099556))
            ThreePointArc((-63.295127365, 17.024099556), (-62.93918611, 19.095287893), (-63.071681394, 21.192657747))
            ThreePointArc((-63.071681394, 21.192657747), (-63.708139072, 21.436670368), (-64.352542228, 21.658852965))
            ThreePointArc((-64.352542228, 21.658852965), (-65.802202859, 20.13734077), (-66.86087024, 18.321923825))
            ThreePointArc((-66.86087024, 18.321923825), (-67.209420336, 17.94386425), (-67.717150364, 17.862461362))
            Line((-67.717150364, 17.862461362), (-68.003755086, 17.912997508))
            ThreePointArc((-68.003755086, 17.912997508), (-68.453023821, 18.163145097), (-68.651249783, 18.637616045))
        make_face()
        with BuildLine():
            Line((-70.548541938, 3.642817953), (-70.548541938, 1.642817953))
            ThreePointArc((-70.548541938, 1.642817953), (-71.548541938, 2.642817953), (-70.548541938, 3.642817953))
        make_face(mode=Mode.SUBTRACT)
    extrude(amount=F_36MM_SPUR_GEAR1_DEPTH)


with BuildPart() as body_2_1:
    # Körper-Verschieben/Kopieren6: read off the stored shape, not the designer's step
    # Körper-Verschieben/Kopieren6: moved
    add(body_2.part.moved(Location((26.0485419, -2.642818, 18.5))))

    # Kombinieren2: union part
    add(part.part)

    # Skizze7 → Schnitt-Linear austragen3 (cut, through all)
    with BuildSketch(Plane.XY.offset(1.5)):
        with Locations((-44.5, 0)):
            Rectangle(SKIZZE7_W, SKIZZE7_H)
    extrude(amount=-SCHNITT_LINEAR_AUSTRAGEN3_DEPTH, mode=Mode.SUBTRACT)

    # Skizze8 → Schnitt-Linear austragen4 (cut, through all)
    with BuildSketch(Plane.XY.offset(1.5)):
        with Locations((-49.5, 0)):
            Circle(SKIZZE8_R)
        with Locations((-39.5, 0)):
            Circle(SKIZZE8_R)
    extrude(amount=-SCHNITT_LINEAR_AUSTRAGEN4_DEPTH, mode=Mode.SUBTRACT)


solid = body_2_1.part
